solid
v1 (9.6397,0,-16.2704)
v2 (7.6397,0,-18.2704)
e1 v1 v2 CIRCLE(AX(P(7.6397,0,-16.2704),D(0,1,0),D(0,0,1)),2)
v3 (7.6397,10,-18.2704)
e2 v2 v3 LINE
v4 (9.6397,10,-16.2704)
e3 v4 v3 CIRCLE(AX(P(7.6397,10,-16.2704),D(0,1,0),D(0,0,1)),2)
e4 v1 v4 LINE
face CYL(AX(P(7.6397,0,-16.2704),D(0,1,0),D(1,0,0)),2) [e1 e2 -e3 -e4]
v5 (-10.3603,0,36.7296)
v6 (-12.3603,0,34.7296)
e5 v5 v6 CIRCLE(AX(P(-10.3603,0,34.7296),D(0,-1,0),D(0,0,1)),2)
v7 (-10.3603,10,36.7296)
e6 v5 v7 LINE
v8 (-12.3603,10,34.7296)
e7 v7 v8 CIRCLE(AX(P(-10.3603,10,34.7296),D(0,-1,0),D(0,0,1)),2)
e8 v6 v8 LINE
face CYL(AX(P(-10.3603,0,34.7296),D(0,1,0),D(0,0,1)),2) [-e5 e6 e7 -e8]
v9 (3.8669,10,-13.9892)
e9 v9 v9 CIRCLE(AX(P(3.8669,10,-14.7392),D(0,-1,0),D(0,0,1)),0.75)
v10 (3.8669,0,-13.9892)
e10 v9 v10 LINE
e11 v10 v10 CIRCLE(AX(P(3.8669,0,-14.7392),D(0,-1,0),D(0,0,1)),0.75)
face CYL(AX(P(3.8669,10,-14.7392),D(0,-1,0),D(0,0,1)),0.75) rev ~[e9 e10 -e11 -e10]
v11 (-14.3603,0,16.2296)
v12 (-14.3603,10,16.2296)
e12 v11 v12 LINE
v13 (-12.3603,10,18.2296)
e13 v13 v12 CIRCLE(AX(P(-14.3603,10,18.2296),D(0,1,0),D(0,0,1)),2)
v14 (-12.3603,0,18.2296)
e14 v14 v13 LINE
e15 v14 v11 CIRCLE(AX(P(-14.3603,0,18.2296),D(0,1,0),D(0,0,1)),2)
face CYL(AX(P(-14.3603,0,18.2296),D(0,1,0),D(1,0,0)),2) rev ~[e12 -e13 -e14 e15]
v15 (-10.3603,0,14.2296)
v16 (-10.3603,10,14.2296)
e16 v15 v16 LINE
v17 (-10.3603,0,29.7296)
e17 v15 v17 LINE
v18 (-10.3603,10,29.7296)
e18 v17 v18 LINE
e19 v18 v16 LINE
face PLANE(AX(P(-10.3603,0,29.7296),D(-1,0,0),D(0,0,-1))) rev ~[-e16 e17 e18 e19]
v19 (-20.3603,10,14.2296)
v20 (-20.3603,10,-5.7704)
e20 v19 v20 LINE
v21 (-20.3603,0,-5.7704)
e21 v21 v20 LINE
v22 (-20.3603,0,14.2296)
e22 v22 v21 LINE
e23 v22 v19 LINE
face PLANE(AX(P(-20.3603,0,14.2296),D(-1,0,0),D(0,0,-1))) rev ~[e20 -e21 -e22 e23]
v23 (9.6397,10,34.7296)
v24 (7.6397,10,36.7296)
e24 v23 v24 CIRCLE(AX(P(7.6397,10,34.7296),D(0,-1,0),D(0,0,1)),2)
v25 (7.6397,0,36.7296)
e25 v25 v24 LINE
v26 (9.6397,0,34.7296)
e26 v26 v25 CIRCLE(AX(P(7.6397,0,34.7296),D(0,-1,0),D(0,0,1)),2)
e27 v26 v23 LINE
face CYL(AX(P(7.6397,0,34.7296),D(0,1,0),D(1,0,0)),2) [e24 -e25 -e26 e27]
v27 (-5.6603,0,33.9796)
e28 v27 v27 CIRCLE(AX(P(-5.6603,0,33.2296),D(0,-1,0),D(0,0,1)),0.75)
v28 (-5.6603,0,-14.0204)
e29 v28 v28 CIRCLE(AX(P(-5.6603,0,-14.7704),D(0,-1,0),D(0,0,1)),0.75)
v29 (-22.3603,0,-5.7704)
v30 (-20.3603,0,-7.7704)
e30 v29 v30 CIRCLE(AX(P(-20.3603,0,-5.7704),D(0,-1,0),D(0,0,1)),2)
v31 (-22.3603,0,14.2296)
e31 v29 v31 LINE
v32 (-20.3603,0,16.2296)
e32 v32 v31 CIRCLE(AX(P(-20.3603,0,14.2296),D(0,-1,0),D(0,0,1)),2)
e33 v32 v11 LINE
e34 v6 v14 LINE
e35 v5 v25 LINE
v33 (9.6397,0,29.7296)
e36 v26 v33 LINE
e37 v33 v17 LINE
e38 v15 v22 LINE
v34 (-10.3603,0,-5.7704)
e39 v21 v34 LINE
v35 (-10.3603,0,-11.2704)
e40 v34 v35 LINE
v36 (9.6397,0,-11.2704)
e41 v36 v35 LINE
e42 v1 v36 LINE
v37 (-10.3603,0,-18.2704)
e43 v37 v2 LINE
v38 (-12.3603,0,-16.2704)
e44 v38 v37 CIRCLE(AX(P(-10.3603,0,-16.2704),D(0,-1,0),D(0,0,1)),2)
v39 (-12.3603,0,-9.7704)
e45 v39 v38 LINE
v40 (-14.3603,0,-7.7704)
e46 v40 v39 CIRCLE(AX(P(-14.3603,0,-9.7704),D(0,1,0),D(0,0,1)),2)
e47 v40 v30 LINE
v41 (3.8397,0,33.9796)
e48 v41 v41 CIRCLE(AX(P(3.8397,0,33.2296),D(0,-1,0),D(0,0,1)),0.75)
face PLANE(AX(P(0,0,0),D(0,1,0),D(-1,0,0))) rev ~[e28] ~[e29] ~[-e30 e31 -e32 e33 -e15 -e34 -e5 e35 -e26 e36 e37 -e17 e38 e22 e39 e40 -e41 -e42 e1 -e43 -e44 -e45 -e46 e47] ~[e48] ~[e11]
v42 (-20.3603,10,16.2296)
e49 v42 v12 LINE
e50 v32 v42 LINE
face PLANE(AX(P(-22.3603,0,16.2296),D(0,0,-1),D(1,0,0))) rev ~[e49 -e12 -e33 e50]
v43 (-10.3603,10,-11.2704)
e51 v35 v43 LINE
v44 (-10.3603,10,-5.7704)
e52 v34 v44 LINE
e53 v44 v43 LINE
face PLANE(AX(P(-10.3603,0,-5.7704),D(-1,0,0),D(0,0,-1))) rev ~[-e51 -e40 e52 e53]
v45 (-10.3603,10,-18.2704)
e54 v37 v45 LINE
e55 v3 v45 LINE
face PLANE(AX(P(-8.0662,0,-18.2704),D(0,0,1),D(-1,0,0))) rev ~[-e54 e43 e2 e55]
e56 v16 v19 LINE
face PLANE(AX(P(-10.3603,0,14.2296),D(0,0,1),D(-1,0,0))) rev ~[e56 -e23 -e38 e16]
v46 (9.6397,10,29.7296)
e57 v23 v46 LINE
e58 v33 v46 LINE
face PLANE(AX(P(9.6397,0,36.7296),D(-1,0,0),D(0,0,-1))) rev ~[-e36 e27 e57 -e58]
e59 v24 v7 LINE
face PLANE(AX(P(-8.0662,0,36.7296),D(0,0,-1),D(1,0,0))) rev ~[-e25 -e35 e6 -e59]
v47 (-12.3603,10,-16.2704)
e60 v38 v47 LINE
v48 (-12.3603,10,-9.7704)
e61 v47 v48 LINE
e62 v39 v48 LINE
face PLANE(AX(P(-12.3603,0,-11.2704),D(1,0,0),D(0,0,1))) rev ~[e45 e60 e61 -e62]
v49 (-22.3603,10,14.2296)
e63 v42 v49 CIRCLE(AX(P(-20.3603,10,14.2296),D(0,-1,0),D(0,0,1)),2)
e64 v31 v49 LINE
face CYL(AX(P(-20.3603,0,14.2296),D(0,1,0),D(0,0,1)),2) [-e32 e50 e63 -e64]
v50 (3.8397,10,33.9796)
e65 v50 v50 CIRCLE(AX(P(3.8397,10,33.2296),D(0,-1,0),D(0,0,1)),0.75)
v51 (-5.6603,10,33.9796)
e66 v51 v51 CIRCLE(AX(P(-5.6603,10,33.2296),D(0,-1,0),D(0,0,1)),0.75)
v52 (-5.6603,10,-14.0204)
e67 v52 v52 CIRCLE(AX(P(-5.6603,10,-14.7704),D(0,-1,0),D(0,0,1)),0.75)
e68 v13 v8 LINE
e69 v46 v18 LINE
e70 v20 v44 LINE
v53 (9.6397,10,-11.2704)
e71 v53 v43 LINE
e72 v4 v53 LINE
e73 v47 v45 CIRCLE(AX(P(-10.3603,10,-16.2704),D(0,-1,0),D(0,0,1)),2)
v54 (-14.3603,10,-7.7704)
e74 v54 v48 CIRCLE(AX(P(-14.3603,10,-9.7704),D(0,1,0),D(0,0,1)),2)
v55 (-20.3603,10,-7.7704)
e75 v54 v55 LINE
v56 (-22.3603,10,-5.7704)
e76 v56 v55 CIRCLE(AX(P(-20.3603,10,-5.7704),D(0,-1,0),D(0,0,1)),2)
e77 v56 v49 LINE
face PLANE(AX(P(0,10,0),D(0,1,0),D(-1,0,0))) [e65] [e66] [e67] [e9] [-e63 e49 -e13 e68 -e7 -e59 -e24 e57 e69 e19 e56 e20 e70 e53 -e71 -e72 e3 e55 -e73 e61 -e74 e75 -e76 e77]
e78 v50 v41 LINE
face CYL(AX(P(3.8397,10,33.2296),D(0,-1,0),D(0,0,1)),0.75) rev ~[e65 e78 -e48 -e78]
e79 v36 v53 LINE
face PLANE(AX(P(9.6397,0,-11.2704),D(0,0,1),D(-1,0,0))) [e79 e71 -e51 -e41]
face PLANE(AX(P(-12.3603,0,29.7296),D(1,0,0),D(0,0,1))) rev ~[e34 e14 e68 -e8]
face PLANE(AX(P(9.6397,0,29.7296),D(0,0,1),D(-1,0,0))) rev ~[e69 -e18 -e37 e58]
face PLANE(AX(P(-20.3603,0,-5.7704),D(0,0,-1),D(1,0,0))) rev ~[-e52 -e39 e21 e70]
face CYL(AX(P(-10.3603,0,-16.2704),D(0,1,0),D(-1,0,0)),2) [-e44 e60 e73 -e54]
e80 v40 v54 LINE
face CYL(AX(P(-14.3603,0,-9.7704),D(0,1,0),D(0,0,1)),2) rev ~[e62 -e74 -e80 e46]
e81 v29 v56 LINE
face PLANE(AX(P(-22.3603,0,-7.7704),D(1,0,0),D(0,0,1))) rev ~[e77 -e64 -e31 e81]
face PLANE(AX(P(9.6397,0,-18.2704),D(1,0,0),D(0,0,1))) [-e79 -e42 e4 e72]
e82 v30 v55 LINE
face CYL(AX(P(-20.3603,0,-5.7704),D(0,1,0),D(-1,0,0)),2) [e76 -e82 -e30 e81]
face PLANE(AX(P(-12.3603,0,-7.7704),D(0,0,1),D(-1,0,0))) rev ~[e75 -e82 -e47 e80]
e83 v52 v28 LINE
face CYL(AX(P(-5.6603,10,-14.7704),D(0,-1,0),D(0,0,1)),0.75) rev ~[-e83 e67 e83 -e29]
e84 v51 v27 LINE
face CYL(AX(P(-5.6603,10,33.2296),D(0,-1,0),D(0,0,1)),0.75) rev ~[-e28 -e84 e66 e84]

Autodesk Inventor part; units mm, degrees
ref_plane "YZ Plane" through (0, 0, 0) normal (1, 0, 0) x (0, 1, 0)
ref_plane "XZ Plane" through (0, 0, 0) normal (0, 1, 0) x (-1, 0, 0)
ref_plane "XY Plane" through (0, 0, 0) normal (0, 0, 1) x (1, 0, 0)
sketch "Sketch1" plane through (0, 0, 0) normal (0, 1, 0) x (-1, 0, 0)
  line L0 (-9.6397, 29.7296) -> (10.3603, 29.7296)
  line L1 (12.3603, 29.7296) -> (12.3603, 36.7296)
  line L2 (12.3603, 36.7296) -> (-9.6397, 36.7296)
  line L3 (-9.6397, 36.7296) -> (-9.6397, 29.7296)
  line L4 (12.3603, 36.7296) -> (8.0662, 36.7296)
  line L5 (8.0662, -18.2704) -> (12.3603, -18.2704)
  line L6 (12.3603, -18.2704) -> (-9.6397, -18.2704)
  line L7 (-9.6397, -18.2704) -> (-9.6397, -11.2704)
  line L8 (-9.6397, -11.2704) -> (10.3603, -11.2704)
  line L9 (12.3603, -11.2704) -> (12.3603, -18.2704)
  line L10 (12.3603, -7.7704) -> (22.3603, -7.7704)
  line L11 (22.3603, -7.7704) -> (22.3603, 16.2296)
  line L12 (22.3603, 16.2296) -> (12.3603, 16.2296)
  line L13 (12.3603, -18.2704) -> (12.3603, -7.7704)
  line L14 (12.3603, 16.2296) -> (12.3603, 36.7296)
  line L15 (10.3603, 14.2296) -> (20.3603, 14.2296)
  line L16 (20.3603, 14.2296) -> (20.3603, -5.7704)
  line L17 (20.3603, -5.7704) -> (10.3603, -5.7704)
  line L18 (10.3603, 22.4354) -> (10.3603, 14.2296)
  line L19 (10.3603, -5.7704) -> (10.3603, -4.741)
  line L20 (10.3603, 29.7296) -> (10.3603, 14.2296)
  line L21 (10.3603, -5.7704) -> (10.3603, -11.2704)
  point P0 (0, 0)
  dimension "wall" = 2
  dimension "d1" = 2
  dimension "d2" = 2
  dimension "d3" = 2
  dimension "d4" = 2
  dimension "d5" = 7
  dimension "d6" = 7
  dimension "d7" = 20
  dimension "d8" = 20
  dimension "d9" = 41
  dimension "d10" = 5.5
  dimension "d11" = 20
  dimension "d12" = 10
extrude "Extrusion1" add sketch "Sketch1" along normal blind 10
sketch "Sketch2" plane through (0, 10, 0) normal (0, 1, 0) x (1, 0, 0)
  line L0 (-10.3603, -29.7296) -> (-10.3603, -14.2296) construction
  line L1 (-12.3603, -36.7296) -> (9.6397, -36.7296) construction
  line L2 (9.6397, 18.2704) -> (-12.3603, 18.2704) construction
  line L3 (3.8669, 14.7392) -> (-5.6603, 14.7392) construction
  line L4 (-5.6603, 14.7392) -> (-5.6603, -33.2296) construction
  line L5 (-5.6603, -33.2296) -> (3.8669, -33.2296) construction
  line L6 (3.8669, -33.2296) -> (3.8669, 14.7392) construction
  point P0 (0, 0)
  point P1 (3.8397, -33.2296)
  point P2 (-5.6603, 14.7704)
  dimension "d15" = 4.7
  dimension "d16" = 9.5
  dimension "d17" = 48
  dimension "d18" = 3.5
  dimension "d19" = 3.5
hole "Hole1" at (-5.6603, 10, 33.2296) at (3.8397, 10, 33.2296) at (3.8669, 10, -14.7392) at (-5.6603, 10, -14.7704) direction (0, -1, 0) diameter 1.5 end through all
fillet "Fillet1" radius 2 8 edges at (9.6397, 5, 36.7296) (-12.3603, 5, 36.7296) (9.6397, 5, -18.2704) (-12.3603, 5, -18.2704) (-22.3603, 5, -7.7704) (-12.3603, 5, -7.7704) (-22.3603, 5, 16.2296) (-12.3603, 5, 16.2296)
equation "\"d1\" = wall"
equation "\"d2\" = wall"
equation "\"d3\" = wall"
equation "\"d4\" = wall"
equation "\"d6\" = d5"
equation "\"d8\" = d7"
equation "\"d19\" = d18"
properties part number "servo_bracket"
